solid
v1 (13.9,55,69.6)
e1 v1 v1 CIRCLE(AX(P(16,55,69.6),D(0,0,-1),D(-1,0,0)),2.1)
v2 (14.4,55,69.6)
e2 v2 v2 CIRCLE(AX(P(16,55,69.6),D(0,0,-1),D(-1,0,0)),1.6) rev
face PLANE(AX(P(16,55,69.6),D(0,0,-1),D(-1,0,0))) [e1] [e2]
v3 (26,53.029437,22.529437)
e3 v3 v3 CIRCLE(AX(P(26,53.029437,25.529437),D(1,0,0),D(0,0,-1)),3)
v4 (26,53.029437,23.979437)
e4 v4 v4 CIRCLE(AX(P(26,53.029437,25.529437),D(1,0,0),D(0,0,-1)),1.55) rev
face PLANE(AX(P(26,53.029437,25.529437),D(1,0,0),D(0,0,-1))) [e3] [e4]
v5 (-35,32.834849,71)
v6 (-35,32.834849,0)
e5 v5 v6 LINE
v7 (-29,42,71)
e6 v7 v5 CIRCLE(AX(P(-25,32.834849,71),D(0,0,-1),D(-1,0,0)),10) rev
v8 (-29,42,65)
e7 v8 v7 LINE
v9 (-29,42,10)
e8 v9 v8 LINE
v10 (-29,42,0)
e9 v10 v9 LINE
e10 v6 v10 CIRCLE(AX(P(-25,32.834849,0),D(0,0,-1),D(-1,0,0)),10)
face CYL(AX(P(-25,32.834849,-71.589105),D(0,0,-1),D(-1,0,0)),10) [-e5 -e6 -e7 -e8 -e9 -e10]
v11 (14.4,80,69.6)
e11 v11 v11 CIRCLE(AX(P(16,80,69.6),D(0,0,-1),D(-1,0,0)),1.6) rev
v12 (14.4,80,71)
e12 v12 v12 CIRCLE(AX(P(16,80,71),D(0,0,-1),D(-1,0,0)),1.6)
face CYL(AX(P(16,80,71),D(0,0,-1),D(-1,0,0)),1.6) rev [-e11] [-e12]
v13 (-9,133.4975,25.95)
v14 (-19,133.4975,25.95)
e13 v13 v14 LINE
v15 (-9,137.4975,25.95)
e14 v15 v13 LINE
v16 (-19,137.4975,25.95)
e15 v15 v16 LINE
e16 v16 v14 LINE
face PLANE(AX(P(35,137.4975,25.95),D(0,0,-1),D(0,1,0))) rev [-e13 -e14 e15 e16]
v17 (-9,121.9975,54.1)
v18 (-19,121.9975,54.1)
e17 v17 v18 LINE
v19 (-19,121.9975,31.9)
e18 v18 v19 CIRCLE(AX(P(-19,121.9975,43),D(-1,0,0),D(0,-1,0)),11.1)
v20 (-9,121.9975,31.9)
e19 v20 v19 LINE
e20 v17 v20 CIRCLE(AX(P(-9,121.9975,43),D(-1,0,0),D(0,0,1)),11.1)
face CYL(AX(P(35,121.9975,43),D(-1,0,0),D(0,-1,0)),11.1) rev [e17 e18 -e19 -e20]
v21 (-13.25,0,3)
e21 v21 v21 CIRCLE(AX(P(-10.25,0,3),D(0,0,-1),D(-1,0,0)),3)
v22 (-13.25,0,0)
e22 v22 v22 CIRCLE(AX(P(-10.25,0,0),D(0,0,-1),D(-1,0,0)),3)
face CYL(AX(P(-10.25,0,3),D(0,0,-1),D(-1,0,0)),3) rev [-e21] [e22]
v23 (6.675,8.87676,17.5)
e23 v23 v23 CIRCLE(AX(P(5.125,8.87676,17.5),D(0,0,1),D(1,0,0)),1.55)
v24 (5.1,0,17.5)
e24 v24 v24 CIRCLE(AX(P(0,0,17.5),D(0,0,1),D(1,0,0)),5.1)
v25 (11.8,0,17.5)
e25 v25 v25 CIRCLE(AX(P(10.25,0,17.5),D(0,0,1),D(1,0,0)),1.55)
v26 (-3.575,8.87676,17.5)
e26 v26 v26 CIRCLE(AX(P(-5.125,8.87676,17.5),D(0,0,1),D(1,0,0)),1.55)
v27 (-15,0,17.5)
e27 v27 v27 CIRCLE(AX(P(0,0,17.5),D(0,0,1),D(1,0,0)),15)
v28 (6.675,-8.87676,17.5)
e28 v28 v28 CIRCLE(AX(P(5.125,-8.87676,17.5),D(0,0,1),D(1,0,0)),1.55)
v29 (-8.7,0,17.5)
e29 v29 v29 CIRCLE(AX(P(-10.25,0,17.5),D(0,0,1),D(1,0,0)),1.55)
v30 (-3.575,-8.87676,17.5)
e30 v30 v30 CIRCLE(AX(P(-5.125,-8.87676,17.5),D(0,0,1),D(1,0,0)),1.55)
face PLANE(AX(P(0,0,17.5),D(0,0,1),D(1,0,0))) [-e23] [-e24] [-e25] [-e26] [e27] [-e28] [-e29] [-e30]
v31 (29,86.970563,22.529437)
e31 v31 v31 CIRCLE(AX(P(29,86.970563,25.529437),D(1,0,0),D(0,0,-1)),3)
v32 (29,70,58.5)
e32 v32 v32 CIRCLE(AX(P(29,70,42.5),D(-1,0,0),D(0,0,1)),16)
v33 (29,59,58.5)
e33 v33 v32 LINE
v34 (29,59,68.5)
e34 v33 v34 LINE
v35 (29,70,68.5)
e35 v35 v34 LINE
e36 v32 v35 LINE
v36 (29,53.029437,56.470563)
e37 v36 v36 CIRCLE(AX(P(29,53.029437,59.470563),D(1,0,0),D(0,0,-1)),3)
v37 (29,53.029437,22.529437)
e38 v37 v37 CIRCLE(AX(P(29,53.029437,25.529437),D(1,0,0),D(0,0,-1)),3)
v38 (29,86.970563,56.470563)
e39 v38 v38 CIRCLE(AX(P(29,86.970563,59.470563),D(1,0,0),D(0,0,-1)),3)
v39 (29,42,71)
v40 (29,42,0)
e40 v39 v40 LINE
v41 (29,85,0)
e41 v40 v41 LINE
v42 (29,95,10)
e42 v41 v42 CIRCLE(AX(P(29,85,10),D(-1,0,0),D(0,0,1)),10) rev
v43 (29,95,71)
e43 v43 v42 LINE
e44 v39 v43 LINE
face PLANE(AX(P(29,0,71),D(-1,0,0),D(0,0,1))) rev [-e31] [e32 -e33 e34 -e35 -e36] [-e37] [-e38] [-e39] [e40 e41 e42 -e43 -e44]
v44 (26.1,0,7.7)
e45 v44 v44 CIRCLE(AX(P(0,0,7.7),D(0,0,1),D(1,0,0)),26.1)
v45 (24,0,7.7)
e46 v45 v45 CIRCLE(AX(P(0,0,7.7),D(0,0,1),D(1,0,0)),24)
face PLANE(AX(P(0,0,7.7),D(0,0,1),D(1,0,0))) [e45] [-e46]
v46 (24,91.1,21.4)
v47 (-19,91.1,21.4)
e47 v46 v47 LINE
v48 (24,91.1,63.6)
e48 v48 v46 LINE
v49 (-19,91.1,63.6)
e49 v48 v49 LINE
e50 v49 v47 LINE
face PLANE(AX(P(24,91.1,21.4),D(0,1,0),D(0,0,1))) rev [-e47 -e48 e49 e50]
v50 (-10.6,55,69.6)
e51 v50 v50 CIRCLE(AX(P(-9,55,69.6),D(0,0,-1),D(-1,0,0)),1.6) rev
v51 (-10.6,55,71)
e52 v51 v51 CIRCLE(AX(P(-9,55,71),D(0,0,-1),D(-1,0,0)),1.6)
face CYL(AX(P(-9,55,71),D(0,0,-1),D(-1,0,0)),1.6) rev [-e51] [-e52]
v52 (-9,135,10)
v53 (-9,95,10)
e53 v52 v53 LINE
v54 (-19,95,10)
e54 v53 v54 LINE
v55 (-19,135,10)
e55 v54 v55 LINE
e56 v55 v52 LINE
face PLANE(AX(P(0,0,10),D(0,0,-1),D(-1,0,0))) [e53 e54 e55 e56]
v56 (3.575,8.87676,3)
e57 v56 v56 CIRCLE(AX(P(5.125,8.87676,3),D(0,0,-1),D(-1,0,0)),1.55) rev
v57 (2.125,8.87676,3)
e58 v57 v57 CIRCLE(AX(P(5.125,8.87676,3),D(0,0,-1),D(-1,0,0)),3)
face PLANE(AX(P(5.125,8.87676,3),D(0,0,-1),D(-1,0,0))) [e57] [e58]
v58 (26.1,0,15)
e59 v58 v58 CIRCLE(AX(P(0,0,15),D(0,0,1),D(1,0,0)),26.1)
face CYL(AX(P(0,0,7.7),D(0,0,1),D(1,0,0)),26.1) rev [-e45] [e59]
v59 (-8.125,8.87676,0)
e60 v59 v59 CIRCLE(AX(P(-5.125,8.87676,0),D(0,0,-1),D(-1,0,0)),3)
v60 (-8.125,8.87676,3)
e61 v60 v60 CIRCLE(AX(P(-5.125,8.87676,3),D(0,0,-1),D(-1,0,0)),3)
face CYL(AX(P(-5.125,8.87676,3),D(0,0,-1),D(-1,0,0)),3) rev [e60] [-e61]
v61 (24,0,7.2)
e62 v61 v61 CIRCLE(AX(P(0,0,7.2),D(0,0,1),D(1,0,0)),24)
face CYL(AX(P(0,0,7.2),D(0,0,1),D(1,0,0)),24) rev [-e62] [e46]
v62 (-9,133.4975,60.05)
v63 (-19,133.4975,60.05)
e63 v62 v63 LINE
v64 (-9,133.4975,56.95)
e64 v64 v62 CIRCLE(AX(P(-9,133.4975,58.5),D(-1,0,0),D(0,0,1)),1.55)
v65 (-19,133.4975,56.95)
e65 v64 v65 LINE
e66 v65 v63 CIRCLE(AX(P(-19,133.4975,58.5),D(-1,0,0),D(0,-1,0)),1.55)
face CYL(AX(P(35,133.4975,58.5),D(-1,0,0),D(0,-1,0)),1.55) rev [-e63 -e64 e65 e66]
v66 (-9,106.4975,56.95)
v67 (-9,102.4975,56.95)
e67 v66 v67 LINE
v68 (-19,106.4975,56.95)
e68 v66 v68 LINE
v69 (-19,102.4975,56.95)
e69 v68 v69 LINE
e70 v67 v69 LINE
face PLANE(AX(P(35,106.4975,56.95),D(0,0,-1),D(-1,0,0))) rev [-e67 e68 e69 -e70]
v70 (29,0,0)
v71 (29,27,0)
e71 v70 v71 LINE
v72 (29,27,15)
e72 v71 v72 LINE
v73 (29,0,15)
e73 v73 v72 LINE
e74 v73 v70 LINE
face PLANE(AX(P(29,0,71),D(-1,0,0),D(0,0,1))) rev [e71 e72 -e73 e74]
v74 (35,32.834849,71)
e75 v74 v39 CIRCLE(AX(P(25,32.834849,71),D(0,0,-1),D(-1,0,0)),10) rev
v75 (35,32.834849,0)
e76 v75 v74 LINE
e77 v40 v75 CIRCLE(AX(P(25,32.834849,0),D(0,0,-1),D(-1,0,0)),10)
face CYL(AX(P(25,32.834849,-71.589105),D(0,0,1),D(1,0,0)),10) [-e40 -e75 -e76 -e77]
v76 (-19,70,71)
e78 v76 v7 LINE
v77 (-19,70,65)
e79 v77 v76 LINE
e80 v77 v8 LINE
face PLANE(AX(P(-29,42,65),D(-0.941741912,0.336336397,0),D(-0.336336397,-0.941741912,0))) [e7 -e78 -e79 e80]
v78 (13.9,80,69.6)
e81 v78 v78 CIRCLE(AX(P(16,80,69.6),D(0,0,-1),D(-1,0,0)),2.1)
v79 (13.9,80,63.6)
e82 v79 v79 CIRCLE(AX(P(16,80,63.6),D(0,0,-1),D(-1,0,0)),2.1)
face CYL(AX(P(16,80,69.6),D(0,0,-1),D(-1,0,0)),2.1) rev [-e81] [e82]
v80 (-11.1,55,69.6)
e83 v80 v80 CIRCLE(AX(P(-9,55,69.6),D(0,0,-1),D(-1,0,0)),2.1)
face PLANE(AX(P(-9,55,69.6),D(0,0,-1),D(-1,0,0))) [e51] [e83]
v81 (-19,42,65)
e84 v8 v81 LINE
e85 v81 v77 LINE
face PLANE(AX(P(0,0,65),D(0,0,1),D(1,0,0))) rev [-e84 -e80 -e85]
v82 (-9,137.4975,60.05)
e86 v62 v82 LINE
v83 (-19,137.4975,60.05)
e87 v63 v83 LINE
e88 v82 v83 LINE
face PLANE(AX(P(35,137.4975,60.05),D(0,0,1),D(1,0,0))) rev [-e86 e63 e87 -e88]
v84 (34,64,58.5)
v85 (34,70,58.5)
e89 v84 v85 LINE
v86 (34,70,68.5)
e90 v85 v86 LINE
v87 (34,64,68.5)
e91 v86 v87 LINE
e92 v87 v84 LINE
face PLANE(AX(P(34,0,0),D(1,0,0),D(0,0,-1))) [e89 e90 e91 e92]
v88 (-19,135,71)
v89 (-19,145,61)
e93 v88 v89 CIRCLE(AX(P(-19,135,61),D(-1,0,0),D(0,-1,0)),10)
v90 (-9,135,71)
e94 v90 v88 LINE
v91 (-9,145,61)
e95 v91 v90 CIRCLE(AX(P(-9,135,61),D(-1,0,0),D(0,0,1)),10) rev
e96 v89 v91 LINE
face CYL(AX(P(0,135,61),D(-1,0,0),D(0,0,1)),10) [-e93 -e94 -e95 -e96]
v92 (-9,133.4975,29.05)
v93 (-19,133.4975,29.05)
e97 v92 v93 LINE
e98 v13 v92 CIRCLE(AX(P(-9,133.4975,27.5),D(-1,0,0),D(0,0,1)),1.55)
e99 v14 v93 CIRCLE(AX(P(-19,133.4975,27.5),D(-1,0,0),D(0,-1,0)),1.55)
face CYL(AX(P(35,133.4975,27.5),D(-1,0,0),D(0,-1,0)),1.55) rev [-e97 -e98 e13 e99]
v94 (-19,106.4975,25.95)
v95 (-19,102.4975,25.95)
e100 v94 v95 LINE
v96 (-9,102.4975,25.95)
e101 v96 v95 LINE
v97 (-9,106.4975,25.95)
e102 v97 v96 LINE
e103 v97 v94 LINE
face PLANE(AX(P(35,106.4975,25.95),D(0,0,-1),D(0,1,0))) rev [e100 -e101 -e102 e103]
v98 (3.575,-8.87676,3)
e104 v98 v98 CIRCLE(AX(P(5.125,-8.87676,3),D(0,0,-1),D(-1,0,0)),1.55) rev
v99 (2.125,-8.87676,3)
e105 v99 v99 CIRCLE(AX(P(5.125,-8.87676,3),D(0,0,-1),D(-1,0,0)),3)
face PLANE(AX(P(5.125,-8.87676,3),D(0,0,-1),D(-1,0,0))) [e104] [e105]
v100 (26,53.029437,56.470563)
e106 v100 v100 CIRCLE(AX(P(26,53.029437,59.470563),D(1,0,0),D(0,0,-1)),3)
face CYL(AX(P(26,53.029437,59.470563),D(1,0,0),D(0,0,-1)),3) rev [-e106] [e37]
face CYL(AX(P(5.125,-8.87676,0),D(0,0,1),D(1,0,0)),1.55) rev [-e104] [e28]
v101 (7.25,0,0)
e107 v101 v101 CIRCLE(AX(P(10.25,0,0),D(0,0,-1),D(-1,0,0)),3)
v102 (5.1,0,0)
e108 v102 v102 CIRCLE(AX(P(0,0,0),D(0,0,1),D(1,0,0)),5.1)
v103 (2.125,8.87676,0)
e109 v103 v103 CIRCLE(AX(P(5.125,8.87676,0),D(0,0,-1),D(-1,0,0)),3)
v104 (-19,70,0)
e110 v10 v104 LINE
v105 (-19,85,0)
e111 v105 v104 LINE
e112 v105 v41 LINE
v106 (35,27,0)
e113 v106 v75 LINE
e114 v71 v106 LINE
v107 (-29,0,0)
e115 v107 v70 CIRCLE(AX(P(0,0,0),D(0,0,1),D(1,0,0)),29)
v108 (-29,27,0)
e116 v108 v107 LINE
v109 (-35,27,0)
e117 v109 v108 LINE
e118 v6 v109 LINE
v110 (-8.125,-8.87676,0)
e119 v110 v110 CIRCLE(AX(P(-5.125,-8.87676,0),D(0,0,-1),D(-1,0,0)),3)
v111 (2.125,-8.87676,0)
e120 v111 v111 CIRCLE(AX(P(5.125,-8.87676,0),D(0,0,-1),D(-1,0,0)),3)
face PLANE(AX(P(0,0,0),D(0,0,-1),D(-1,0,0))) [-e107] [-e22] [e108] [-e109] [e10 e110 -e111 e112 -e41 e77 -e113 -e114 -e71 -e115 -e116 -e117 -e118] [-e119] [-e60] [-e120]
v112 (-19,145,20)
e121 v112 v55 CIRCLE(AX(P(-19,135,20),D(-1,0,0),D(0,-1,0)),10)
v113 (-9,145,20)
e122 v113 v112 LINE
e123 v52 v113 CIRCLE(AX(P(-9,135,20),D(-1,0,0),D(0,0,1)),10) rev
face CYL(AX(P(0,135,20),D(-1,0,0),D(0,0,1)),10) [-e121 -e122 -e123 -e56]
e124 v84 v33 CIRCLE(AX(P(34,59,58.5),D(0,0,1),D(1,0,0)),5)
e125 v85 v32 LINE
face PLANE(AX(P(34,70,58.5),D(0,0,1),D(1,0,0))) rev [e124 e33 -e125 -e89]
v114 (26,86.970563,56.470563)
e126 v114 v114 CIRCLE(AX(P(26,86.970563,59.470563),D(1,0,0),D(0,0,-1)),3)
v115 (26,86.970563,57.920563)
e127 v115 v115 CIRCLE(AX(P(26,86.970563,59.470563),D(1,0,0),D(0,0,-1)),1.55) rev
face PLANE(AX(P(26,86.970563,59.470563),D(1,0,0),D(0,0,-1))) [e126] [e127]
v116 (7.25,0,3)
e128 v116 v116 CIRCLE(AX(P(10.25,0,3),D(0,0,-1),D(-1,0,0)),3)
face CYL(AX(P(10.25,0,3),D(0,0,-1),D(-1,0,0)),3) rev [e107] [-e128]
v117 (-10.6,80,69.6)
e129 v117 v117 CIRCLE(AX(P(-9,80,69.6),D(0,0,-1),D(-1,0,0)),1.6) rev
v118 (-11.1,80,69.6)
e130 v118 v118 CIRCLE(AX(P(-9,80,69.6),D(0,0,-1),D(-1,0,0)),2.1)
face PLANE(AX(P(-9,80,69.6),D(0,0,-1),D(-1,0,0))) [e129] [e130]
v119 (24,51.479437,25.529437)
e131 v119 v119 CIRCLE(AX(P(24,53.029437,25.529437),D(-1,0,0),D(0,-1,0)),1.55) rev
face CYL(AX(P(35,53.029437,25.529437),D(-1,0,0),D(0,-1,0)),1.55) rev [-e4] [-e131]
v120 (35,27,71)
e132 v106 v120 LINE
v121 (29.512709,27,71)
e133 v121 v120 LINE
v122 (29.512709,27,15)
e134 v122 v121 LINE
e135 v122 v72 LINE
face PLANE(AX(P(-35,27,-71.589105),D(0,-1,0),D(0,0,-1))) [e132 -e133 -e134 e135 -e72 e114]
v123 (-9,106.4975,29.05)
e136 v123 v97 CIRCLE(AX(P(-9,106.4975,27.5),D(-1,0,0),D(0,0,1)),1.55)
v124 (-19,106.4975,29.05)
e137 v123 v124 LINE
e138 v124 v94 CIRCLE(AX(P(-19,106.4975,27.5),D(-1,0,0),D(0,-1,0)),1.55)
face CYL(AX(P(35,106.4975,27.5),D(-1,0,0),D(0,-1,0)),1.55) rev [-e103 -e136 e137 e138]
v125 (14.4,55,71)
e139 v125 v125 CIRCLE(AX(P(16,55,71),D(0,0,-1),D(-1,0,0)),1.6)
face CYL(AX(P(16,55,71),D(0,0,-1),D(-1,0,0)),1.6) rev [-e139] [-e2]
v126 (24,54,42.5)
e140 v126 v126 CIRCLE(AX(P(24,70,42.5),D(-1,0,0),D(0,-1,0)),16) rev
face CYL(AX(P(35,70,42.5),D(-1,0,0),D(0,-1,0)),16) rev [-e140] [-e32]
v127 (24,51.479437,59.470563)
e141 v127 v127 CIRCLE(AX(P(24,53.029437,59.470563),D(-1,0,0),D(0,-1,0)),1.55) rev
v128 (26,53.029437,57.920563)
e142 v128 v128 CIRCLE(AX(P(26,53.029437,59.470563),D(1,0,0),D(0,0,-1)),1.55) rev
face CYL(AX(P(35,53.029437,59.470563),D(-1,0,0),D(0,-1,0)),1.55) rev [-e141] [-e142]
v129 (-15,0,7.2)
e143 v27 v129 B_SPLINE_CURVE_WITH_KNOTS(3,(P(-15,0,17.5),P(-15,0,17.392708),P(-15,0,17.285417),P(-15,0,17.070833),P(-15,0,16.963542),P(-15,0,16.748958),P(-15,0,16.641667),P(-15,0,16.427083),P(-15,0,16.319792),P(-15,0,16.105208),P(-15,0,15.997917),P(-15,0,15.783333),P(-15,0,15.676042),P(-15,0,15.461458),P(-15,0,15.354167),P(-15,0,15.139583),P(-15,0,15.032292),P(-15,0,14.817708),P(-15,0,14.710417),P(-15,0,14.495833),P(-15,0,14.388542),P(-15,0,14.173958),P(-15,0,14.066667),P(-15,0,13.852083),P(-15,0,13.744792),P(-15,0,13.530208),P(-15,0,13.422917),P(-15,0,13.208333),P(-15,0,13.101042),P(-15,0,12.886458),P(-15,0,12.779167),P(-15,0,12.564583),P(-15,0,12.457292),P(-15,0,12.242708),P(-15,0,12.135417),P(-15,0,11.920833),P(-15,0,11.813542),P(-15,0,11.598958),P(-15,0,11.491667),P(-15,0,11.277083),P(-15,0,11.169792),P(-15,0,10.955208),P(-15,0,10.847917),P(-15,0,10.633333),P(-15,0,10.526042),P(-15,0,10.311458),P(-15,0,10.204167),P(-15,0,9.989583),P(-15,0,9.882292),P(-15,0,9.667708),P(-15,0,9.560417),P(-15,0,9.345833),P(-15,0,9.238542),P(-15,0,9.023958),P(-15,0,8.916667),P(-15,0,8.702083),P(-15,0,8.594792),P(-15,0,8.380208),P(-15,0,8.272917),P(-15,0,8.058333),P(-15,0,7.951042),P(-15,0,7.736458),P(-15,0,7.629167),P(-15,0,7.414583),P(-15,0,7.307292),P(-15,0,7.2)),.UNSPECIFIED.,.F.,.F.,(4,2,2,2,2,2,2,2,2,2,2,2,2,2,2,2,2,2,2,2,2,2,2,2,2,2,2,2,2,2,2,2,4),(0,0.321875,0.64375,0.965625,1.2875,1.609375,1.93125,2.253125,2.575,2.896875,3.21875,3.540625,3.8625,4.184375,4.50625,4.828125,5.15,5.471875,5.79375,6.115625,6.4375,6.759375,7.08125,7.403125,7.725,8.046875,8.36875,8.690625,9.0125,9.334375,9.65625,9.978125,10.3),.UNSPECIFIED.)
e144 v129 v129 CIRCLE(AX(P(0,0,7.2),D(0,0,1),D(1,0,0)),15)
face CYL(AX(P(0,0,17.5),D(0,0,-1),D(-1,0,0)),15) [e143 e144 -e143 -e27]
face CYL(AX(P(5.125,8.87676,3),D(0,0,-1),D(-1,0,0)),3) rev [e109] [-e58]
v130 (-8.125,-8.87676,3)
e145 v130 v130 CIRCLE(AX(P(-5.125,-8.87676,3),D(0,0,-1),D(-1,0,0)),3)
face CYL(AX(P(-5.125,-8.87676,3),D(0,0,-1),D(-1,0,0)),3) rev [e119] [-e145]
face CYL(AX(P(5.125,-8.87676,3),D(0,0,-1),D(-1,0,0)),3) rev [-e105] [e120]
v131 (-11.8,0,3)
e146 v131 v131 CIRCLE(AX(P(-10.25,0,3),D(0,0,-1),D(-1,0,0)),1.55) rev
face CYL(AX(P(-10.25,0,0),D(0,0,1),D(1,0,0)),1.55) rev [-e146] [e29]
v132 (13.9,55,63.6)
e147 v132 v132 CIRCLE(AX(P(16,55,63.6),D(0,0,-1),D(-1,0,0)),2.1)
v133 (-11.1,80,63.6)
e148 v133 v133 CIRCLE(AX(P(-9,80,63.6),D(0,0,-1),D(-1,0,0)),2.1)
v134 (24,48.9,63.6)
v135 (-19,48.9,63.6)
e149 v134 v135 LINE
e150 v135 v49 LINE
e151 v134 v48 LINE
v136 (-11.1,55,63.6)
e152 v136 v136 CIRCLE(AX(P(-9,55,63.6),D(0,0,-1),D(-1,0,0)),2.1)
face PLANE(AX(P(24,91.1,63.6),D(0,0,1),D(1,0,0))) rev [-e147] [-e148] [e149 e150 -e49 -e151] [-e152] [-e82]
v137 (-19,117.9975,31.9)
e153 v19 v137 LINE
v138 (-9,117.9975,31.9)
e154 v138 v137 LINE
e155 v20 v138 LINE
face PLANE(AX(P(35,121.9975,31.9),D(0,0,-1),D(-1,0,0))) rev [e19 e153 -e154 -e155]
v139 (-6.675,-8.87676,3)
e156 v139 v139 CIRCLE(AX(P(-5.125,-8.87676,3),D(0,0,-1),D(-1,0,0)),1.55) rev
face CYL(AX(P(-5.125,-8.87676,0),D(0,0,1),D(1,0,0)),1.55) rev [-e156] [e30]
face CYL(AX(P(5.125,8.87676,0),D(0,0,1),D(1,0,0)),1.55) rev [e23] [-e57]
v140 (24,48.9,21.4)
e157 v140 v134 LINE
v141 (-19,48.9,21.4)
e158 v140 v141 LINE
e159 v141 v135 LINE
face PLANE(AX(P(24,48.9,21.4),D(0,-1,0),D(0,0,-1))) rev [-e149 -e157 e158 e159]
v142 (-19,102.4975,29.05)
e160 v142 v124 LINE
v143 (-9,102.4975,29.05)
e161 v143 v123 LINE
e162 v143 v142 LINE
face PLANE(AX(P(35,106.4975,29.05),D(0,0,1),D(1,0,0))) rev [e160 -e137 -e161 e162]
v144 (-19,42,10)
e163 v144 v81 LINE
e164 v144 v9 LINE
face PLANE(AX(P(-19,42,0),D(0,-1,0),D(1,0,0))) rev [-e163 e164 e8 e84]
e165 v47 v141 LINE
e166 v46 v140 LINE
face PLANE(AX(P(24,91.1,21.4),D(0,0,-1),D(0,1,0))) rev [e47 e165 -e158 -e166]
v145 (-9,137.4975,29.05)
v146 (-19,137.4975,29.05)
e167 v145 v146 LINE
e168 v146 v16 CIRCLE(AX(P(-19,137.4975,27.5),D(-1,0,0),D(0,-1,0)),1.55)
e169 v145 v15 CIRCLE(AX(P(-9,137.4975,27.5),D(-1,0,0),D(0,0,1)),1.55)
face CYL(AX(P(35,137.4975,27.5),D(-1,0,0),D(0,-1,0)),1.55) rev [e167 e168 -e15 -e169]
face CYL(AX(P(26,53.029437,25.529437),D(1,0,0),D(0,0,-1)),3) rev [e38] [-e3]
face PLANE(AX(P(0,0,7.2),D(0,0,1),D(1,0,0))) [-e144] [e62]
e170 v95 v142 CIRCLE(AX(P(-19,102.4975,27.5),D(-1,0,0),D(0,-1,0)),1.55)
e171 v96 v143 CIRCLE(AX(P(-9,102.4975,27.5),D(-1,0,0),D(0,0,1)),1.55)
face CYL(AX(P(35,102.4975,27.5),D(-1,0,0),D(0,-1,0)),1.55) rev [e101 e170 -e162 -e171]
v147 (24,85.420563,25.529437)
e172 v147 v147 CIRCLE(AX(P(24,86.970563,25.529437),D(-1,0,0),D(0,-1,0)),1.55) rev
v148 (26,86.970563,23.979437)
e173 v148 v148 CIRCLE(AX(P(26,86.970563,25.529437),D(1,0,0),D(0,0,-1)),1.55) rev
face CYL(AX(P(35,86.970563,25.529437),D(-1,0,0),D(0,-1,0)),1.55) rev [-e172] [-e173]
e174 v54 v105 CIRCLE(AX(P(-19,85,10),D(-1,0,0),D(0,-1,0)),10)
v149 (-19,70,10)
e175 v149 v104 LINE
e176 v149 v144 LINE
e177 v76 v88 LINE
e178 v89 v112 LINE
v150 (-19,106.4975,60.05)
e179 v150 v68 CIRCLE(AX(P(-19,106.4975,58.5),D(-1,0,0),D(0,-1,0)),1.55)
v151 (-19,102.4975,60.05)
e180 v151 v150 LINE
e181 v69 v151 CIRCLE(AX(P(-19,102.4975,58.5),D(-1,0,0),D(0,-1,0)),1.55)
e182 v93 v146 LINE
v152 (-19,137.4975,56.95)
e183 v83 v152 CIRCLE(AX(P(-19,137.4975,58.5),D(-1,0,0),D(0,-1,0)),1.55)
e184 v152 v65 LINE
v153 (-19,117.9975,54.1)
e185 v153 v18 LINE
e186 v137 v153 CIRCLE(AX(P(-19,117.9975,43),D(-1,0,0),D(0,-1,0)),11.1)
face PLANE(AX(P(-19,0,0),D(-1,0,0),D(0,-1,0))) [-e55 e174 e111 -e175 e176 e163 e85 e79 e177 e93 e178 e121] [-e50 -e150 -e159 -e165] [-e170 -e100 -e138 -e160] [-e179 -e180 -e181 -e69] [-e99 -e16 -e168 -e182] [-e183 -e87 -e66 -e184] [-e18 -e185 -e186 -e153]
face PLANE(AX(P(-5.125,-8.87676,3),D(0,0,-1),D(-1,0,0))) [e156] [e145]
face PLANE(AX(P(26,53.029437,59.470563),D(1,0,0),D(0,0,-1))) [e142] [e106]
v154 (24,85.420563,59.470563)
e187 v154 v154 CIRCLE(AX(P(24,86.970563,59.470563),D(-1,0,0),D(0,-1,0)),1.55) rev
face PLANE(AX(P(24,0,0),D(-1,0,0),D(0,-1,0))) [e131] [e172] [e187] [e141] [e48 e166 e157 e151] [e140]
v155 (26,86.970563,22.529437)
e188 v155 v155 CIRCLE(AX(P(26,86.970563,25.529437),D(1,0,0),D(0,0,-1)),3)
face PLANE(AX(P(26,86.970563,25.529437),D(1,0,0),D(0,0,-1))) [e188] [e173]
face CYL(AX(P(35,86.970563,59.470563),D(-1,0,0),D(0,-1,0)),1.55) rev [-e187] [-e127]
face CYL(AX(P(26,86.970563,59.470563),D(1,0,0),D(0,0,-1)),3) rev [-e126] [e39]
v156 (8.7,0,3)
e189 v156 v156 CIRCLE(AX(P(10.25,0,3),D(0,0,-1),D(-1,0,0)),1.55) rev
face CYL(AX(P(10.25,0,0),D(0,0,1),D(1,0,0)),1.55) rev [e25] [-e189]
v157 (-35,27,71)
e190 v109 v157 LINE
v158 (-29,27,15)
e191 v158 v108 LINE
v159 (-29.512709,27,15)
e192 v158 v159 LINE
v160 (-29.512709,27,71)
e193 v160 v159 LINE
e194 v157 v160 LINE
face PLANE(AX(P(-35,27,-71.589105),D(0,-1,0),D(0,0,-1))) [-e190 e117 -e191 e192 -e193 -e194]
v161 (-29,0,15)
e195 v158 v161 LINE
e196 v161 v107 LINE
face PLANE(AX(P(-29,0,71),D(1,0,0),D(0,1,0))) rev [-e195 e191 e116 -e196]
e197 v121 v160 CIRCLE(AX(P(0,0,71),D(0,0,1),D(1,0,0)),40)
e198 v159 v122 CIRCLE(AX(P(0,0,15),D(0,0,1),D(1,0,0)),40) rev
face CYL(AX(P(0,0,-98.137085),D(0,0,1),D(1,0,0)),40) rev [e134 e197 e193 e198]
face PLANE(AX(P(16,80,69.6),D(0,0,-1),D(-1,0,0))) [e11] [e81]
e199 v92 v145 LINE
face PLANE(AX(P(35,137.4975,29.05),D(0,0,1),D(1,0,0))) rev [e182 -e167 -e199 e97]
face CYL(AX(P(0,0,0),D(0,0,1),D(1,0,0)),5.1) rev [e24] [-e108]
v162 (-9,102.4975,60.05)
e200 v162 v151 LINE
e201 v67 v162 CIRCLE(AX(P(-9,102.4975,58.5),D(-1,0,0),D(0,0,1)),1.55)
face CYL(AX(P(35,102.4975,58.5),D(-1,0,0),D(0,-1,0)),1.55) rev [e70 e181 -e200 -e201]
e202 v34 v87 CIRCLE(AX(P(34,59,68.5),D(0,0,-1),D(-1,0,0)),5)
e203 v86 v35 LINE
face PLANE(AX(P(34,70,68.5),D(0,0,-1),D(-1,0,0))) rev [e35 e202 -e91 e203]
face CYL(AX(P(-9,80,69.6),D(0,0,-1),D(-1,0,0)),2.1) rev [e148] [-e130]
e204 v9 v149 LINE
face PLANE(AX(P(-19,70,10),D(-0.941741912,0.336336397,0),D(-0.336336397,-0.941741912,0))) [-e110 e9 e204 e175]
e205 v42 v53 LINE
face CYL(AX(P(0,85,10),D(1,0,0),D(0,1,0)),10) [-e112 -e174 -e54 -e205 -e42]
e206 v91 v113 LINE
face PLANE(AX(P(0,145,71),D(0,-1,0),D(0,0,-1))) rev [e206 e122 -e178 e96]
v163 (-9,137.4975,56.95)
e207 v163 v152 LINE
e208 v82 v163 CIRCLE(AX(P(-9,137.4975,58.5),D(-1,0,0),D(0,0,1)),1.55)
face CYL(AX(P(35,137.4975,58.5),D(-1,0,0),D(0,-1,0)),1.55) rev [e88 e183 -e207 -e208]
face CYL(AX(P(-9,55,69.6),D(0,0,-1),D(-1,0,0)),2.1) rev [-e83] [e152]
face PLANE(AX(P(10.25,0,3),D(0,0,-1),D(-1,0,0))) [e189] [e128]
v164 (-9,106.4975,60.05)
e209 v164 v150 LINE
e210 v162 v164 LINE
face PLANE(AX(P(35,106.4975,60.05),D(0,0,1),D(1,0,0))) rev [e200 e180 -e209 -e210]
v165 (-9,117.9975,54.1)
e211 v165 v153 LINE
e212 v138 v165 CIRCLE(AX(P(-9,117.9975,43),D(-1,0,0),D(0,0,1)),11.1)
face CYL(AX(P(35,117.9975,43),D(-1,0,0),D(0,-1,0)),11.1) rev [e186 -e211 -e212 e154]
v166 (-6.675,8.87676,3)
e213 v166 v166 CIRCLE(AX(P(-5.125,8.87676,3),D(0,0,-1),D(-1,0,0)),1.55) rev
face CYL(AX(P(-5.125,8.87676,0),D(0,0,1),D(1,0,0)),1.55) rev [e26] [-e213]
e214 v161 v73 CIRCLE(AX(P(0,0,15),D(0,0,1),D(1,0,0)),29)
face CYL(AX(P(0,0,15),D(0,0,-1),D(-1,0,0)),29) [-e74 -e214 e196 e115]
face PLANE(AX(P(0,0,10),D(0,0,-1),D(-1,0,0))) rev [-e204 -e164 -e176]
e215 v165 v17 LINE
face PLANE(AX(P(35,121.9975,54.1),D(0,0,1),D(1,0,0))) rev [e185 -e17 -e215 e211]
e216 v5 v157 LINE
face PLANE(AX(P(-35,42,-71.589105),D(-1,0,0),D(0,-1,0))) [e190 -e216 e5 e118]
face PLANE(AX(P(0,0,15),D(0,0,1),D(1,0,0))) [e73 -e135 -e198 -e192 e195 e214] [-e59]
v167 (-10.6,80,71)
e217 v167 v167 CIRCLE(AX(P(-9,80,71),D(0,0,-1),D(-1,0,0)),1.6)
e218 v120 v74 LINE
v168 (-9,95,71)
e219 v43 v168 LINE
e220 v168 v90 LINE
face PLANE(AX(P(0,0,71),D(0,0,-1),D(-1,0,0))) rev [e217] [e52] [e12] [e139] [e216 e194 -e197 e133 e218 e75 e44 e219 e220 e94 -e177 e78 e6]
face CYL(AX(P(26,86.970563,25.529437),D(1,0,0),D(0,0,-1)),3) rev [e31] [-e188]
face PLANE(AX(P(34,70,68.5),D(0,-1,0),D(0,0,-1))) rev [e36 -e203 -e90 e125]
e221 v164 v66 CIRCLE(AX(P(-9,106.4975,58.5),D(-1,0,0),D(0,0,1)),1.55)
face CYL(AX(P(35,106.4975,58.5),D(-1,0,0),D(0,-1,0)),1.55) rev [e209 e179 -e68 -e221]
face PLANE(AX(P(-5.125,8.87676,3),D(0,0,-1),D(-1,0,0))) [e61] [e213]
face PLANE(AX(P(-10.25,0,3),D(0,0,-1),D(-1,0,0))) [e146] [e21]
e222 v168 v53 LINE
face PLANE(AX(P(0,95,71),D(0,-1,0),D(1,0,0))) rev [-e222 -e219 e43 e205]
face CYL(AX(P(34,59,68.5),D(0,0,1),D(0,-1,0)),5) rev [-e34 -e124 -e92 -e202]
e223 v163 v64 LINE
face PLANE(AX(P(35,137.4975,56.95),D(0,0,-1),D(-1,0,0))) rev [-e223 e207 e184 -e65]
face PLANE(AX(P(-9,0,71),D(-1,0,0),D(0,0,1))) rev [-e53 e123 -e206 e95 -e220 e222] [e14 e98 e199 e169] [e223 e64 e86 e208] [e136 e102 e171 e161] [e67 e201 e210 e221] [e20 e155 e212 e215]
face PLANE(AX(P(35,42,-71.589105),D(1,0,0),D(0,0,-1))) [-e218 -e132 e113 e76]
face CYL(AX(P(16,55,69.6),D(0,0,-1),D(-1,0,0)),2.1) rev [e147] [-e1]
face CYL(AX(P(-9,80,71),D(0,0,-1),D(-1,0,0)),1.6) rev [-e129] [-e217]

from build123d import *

# Parameters (mm, degrees)
SKETCH_1_R           = 29
EXTRUDE_1_DEPTH      = 15
SKETCH_2_R           = 1.55
SKETCH_2_R_2         = 5.1
CUT_EXTRUDE_1_DEPTH  = 44.669211122
EXTRUDE_2_DEPTH      = 71
SKETCH_12_W          = 70
SKETCH_12_H          = 15
EXTRUDE_3_DEPTH      = 71
FILLET_5_R           = 10
SKETCH_22_W          = 71
SKETCH_22_H          = 103
CUT_EXTRUDE_11_DEPTH = 10
SKETCH_4_R           = 40
CUT_EXTRUDE_2_DEPTH  = 56
SKETCH_5_R           = 16
SKETCH_5_R_2         = 1.55
CUT_EXTRUDE_3_DEPTH  = 171.241005636
SKETCH_6_W           = 42.2
SKETCH_6_H           = 42.2
CUT_EXTRUDE_4_DEPTH  = 43
CUT_EXTRUDE_5_DEPTH  = 171.241005636
SKETCH_8_W           = 10
SKETCH_8_H           = 50
CUT_EXTRUDE_6_DEPTH  = 10
FILLET_1_R           = 10
FILLET_2_R           = 10
FILLET_3_R           = 10
SKETCH_17_R          = 26.1
CUT_EXTRUDE_7_DEPTH  = 7.3
SKETCH_18_R          = 24
CUT_EXTRUDE_8_DEPTH  = 0.5
EXTRUDE_START        = 10.3
SKETCH_19_R          = 15
SKETCH_19_R_2        = 1.55
SKETCH_19_R_3        = 5.1
EXTRUDE_5_DEPTH      = 10.3
SKETCH_20_R          = 3
CUT_EXTRUDE_9_DEPTH  = 3
SKETCH_23_R          = 1.6
CUT_EXTRUDE_12_DEPTH = 163.157207672
SKETCH_26_R          = 2.1
CUT_EXTRUDE_13_DEPTH = 6
SKETCH_27_R          = 3
CUT_EXTRUDE_14_DEPTH = 3
SKETCH_28_W          = 10
SKETCH_28_H          = 6
EXTRUDE_6_DEPTH      = 5
FILLET_6_R           = 5
EXTRUDE_7_DEPTH      = 10
EXTRUDE_8_DEPTH      = 6


# Some blends are built 0.0001 mm under size
with BuildPart() as part:
    # 草图1 → 凸台-拉伸1 (new body)
    with BuildSketch(Plane.XY):
        Circle(SKETCH_1_R)
    extrude(amount=EXTRUDE_1_DEPTH)

    # 草图2 → 切除-拉伸1 (cut, through all)
    with BuildSketch(Plane.XY.offset(15)):
        with Locations((-5.125, 8.876760389)):
            Circle(SKETCH_2_R)
        with Locations((5.125, 8.876760389)):
            Circle(SKETCH_2_R)
        with Locations((10.25, 0)):
            Circle(SKETCH_2_R)
        with Locations((5.125, -8.876760389)):
            Circle(SKETCH_2_R)
        Circle(SKETCH_2_R_2)
        with Locations((-5.125, -8.876760389)):
            Circle(SKETCH_2_R)
        with Locations((-10.25, 0)):
            Circle(SKETCH_2_R)
    extrude(amount=-CUT_EXTRUDE_1_DEPTH, mode=Mode.SUBTRACT)

    # 草图17 → 切除-拉伸7 (cut)
    with BuildSketch(Plane.XY.offset(15)):
        Circle(SKETCH_17_R)
    extrude(amount=-CUT_EXTRUDE_7_DEPTH, mode=Mode.SUBTRACT)

    # 草图18 → 切除-拉伸8 (cut)
    with BuildSketch(Plane.XY.offset(7.7)):
        Circle(SKETCH_18_R)
    extrude(amount=-CUT_EXTRUDE_8_DEPTH, mode=Mode.SUBTRACT)


with BuildPart() as body_2:
    # 草图3 → 凸台-拉伸2 (new body)
    with BuildSketch(Plane.XY):
        with BuildLine():
            ThreePointArc((-29, 0), (0, 29), (29, 0))
            Line((29, 0), (29, 95))
            Line((29, 95), (-9, 95))
            Line((-9, 95), (-9, 145))
            Line((-9, 145), (-29, 145))
            Line((-29, 145), (-29, 0))
        make_face()
    extrude(amount=EXTRUDE_2_DEPTH)

    # 草图12 → 凸台-拉伸3 (add)
    with BuildSketch(Plane.XY.offset(71)):
        with Locations((0, 34.5)):
            Rectangle(SKETCH_12_W, SKETCH_12_H)
    extrude(amount=-EXTRUDE_3_DEPTH)

    # 圆角5
    # the kernel refuses this fillet: 10 mm, written as the material it takes off along each edge
    with BuildSketch(Plane(origin=(35, 42, 93.912878475), x_dir=(0, -1, 0), z_dir=(0, 0, -1))) as fillet_5_piece_1:
        with BuildLine():
            CenterArc((9.16515139, 10), FILLET_5_R, 203.578178478, 66.421821522)
            Line((0, 6), (-0.183303028, 5.92))
            ThreePointArc((-0.183303028, 5.92), (-0.2, 3), (-0.2, 0))
            Line((-0.2, 0), (0, -0.2))
            Line((0, -0.2), (9.16515139, -0.2))
            Line((9.16515139, -0.2), (9.16515139, 0))
        make_face()
    extrude(amount=116.82575695, mode=Mode.SUBTRACT)
    with BuildSketch(Plane(origin=(-35, 42, 93.912878475), x_dir=(0, -1, 0), z_dir=(0, 0, -1))) as fillet_5_piece_2:
        with BuildLine():
            CenterArc((9.16515139, -10), FILLET_5_R, 90, 66.421821522)
            Line((0, -6), (-0.183303028, -5.92))
            ThreePointArc((-0.183303028, -5.92), (-0.2, -3), (-0.2, 0))
            Line((-0.2, 0), (0, 0.2))
            Line((0, 0.2), (9.16515139, 0.2))
            Line((9.16515139, 0.2), (9.16515139, 0))
        make_face()
    extrude(amount=116.82575695, mode=Mode.SUBTRACT)

    # 草图22 → 切除-拉伸11 (cut)
    with BuildSketch(Plane.ZY.offset(29)):
        with Locations((35.5, 93.5)):
            Rectangle(SKETCH_22_W, SKETCH_22_H)
    extrude(amount=-CUT_EXTRUDE_11_DEPTH, mode=Mode.SUBTRACT)

    # 草图4 → 切除-拉伸2 (cut)
    with BuildSketch(Plane.XY.offset(71)):
        Circle(SKETCH_4_R)
    extrude(amount=-CUT_EXTRUDE_2_DEPTH, mode=Mode.SUBTRACT)

    # 草图5 → 切除-拉伸3 (cut, through all)
    with BuildSketch(Plane.ZY.offset(19)):
        with Locations(Location((42.5, 70, 0), (0, 0, 270))):
            Circle(SKETCH_5_R)
        with Locations(Location((25.529437252, 86.970562748, 0), (0, 0, 270))):
            Circle(SKETCH_5_R_2)
        with Locations(Location((59.470562748, 86.970562748, 0), (0, 0, 270))):
            Circle(SKETCH_5_R_2)
        with Locations(Location((59.470562748, 53.029437252, 0), (0, 0, 270))):
            Circle(SKETCH_5_R_2)
        with Locations(Location((25.529437252, 53.029437252, 0), (0, 0, 270))):
            Circle(SKETCH_5_R_2)
    extrude(amount=-CUT_EXTRUDE_3_DEPTH, mode=Mode.SUBTRACT)

    # 草图6 → 切除-拉伸4 (cut)
    with BuildSketch(Plane.ZY.offset(19)):
        with Locations((42.5, 70)):
            Rectangle(SKETCH_6_W, SKETCH_6_H)
    extrude(amount=-CUT_EXTRUDE_4_DEPTH, mode=Mode.SUBTRACT)

    # 草图7 → 切除-拉伸5 (cut, through all)
    with BuildSketch(Plane.ZY.offset(19)):
        with BuildLine():
            Line((56.95, 137.497499937), (56.95, 133.497499937))
            ThreePointArc((56.95, 133.497499937), (58.5, 131.947499937), (60.05, 133.497499937))
            Line((60.05, 133.497499937), (60.05, 137.497499937))
            ThreePointArc((60.05, 137.497499937), (58.5, 139.047499937), (56.95, 137.497499937))
        make_face()
        with BuildLine():
            Line((54.1, 121.997499937), (54.1, 117.997499937))
            ThreePointArc((54.1, 117.997499937), (43, 106.897499937), (31.9, 117.997499937))
            Line((31.9, 117.997499937), (31.9, 121.997499937))
            ThreePointArc((31.9, 121.997499937), (43, 133.097499937), (54.1, 121.997499937))
        make_face()
        with BuildLine():
            Line((29.05, 137.497499937), (29.05, 133.497499937))
            ThreePointArc((29.05, 133.497499937), (27.5, 131.947499937), (25.95, 133.497499937))
            Line((25.95, 133.497499937), (25.95, 137.497499937))
            ThreePointArc((25.95, 137.497499937), (27.5, 139.047499937), (29.05, 137.497499937))
        make_face()
        with BuildLine():
            Line((56.95, 106.497499937), (56.95, 102.497499937))
            ThreePointArc((56.95, 102.497499937), (58.5, 100.947499937), (60.05, 102.497499937))
            Line((60.05, 102.497499937), (60.05, 106.497499937))
            ThreePointArc((60.05, 106.497499937), (58.5, 108.047499937), (56.95, 106.497499937))
        make_face()
        with BuildLine():
            Line((25.95, 106.497499937), (25.95, 102.497499937))
            ThreePointArc((25.95, 102.497499937), (27.5, 100.947499937), (29.05, 102.497499937))
            Line((29.05, 102.497499937), (29.05, 106.497499937))
            ThreePointArc((29.05, 106.497499937), (27.5, 108.047499937), (25.95, 106.497499937))
        make_face()
    extrude(amount=-CUT_EXTRUDE_5_DEPTH, mode=Mode.SUBTRACT)

    # 草图8 → 切除-拉伸6 (cut)
    with BuildSketch(Plane(origin=(0, 0, 0), x_dir=(-1, 0, 0), z_dir=(0, 0, -1))):
        with Locations((14, 120)):
            Rectangle(SKETCH_8_W, SKETCH_8_H)
    extrude(amount=-CUT_EXTRUDE_6_DEPTH, mode=Mode.SUBTRACT)

    # 圆角1
    fillet_1_edges = [body_2.edges().sort_by_distance(p)[0] for p in [
        (5, 95, 0),
    ]]
    fillet(fillet_1_edges, radius=FILLET_1_R)

    # 圆角2
    fillet_2_edges = [body_2.edges().sort_by_distance(p)[0] for p in [
        (-14, 145, 10),
    ]]
    fillet(fillet_2_edges, radius=FILLET_2_R)

    # 圆角3
    fillet_3_edges = [body_2.edges().sort_by_distance(p)[0] for p in [
        (-14, 145, 71),
    ]]
    fillet(fillet_3_edges, radius=FILLET_3_R)


    add(part.part)  # 凸台-拉伸5 merges part
    # 草图19 → 凸台-拉伸5 (add)
    with BuildSketch(Plane.XY.offset(7.2).offset(EXTRUDE_START)):
        with Locations(Location((0, 0, 0), (0, 0, 180))):
            Circle(SKETCH_19_R)
        with Locations((-5.125, -8.876760389)):
            Circle(SKETCH_19_R_2, mode=Mode.SUBTRACT)
        with Locations((5.125, -8.876760389)):
            Circle(SKETCH_19_R_2, mode=Mode.SUBTRACT)
        with Locations((10.25, 0)):
            Circle(SKETCH_19_R_2, mode=Mode.SUBTRACT)
        Circle(SKETCH_19_R_3, mode=Mode.SUBTRACT)
        with Locations((5.125, 8.876760389)):
            Circle(SKETCH_19_R_2, mode=Mode.SUBTRACT)
        with Locations((-5.125, 8.876760389)):
            Circle(SKETCH_19_R_2, mode=Mode.SUBTRACT)
        with Locations((-10.25, 0)):
            Circle(SKETCH_19_R_2, mode=Mode.SUBTRACT)
    extrude(amount=-EXTRUDE_5_DEPTH)

    # 草图20 → 切除-拉伸9 (cut)
    with BuildSketch(Plane(origin=(0, 0, 0), x_dir=(-1, 0, 0), z_dir=(0, 0, -1))):
        with Locations((-5.125, 8.876760389)):
            Circle(SKETCH_20_R)
        with Locations((5.125, 8.876760389)):
            Circle(SKETCH_20_R)
        with Locations((-10.25, 0)):
            Circle(SKETCH_20_R)
        with Locations((-5.125, -8.876760389)):
            Circle(SKETCH_20_R)
        with Locations((5.125, -8.876760389)):
            Circle(SKETCH_20_R)
        with Locations((10.25, 0)):
            Circle(SKETCH_20_R)
    extrude(amount=-CUT_EXTRUDE_9_DEPTH, mode=Mode.SUBTRACT)

    # 草图23 → 切除-拉伸12 (cut, through all)
    with BuildSketch(Plane(origin=(0, 0, 63.6), x_dir=(-1, 0, 0), z_dir=(0, 0, -1))):
        with Locations((-16, 80)):
            Circle(SKETCH_23_R)
        with Locations((9, 80)):
            Circle(SKETCH_23_R)
        with Locations((9, 55)):
            Circle(SKETCH_23_R)
        with Locations((-16, 55)):
            Circle(SKETCH_23_R)
    extrude(amount=-CUT_EXTRUDE_12_DEPTH, mode=Mode.SUBTRACT)

    # 草图26 → 切除-拉伸13 (cut)
    with BuildSketch(Plane(origin=(0, 0, 63.6), x_dir=(-1, 0, 0), z_dir=(0, 0, -1))):
        with Locations((-16, 80)):
            Circle(SKETCH_26_R)
        with Locations((9, 80)):
            Circle(SKETCH_26_R)
        with Locations((-16, 55)):
            Circle(SKETCH_26_R)
        with Locations((9, 55)):
            Circle(SKETCH_26_R)
    extrude(amount=-CUT_EXTRUDE_13_DEPTH, mode=Mode.SUBTRACT)

    # 草图27 → 切除-拉伸14 (cut)
    with BuildSketch(Plane(origin=(29, 0, 0), x_dir=(0, 0, -1), z_dir=(1, 0, 0))):
        with Locations((-59.470562748, 86.970562748)):
            Circle(SKETCH_27_R)
        with Locations((-25.529437252, 86.970562748)):
            Circle(SKETCH_27_R)
        with Locations((-59.470562748, 53.029437252)):
            Circle(SKETCH_27_R)
        with Locations((-25.529437252, 53.029437252)):
            Circle(SKETCH_27_R)
    extrude(amount=-CUT_EXTRUDE_14_DEPTH, mode=Mode.SUBTRACT)

    # 草图28 → 凸台-拉伸6 (add)
    with BuildSketch(Plane(origin=(29, 0, 0), x_dir=(0, 0, -1), z_dir=(1, 0, 0))):
        with Locations((-63.5, 67)):
            Rectangle(SKETCH_28_W, SKETCH_28_H)
    extrude(amount=EXTRUDE_6_DEPTH)

    # 圆角6
    fillet_6_edges = [body_2.edges().sort_by_distance(p)[0] for p in [
        (29, 64, 63.5),
    ]]
    fillet(fillet_6_edges, radius=FILLET_6_R - 0.0001)  # a hair under: the kernel refuses the full size

    # 草图29 → 凸台-拉伸7 (add)
    with BuildSketch(Plane(origin=(0, 0, 0), x_dir=(-1, 0, 0), z_dir=(0, 0, -1))):
        Polygon((19, 70), (29, 42), (19, 42), align=None)
    extrude(amount=-EXTRUDE_7_DEPTH)

    # 草图30 → 凸台-拉伸8 (add)
    with BuildSketch(Plane.XY.offset(71)):
        Polygon((-29, 42), (-19, 70), (-19, 42), align=None)
    extrude(amount=-EXTRUDE_8_DEPTH)


solid = body_2.part
